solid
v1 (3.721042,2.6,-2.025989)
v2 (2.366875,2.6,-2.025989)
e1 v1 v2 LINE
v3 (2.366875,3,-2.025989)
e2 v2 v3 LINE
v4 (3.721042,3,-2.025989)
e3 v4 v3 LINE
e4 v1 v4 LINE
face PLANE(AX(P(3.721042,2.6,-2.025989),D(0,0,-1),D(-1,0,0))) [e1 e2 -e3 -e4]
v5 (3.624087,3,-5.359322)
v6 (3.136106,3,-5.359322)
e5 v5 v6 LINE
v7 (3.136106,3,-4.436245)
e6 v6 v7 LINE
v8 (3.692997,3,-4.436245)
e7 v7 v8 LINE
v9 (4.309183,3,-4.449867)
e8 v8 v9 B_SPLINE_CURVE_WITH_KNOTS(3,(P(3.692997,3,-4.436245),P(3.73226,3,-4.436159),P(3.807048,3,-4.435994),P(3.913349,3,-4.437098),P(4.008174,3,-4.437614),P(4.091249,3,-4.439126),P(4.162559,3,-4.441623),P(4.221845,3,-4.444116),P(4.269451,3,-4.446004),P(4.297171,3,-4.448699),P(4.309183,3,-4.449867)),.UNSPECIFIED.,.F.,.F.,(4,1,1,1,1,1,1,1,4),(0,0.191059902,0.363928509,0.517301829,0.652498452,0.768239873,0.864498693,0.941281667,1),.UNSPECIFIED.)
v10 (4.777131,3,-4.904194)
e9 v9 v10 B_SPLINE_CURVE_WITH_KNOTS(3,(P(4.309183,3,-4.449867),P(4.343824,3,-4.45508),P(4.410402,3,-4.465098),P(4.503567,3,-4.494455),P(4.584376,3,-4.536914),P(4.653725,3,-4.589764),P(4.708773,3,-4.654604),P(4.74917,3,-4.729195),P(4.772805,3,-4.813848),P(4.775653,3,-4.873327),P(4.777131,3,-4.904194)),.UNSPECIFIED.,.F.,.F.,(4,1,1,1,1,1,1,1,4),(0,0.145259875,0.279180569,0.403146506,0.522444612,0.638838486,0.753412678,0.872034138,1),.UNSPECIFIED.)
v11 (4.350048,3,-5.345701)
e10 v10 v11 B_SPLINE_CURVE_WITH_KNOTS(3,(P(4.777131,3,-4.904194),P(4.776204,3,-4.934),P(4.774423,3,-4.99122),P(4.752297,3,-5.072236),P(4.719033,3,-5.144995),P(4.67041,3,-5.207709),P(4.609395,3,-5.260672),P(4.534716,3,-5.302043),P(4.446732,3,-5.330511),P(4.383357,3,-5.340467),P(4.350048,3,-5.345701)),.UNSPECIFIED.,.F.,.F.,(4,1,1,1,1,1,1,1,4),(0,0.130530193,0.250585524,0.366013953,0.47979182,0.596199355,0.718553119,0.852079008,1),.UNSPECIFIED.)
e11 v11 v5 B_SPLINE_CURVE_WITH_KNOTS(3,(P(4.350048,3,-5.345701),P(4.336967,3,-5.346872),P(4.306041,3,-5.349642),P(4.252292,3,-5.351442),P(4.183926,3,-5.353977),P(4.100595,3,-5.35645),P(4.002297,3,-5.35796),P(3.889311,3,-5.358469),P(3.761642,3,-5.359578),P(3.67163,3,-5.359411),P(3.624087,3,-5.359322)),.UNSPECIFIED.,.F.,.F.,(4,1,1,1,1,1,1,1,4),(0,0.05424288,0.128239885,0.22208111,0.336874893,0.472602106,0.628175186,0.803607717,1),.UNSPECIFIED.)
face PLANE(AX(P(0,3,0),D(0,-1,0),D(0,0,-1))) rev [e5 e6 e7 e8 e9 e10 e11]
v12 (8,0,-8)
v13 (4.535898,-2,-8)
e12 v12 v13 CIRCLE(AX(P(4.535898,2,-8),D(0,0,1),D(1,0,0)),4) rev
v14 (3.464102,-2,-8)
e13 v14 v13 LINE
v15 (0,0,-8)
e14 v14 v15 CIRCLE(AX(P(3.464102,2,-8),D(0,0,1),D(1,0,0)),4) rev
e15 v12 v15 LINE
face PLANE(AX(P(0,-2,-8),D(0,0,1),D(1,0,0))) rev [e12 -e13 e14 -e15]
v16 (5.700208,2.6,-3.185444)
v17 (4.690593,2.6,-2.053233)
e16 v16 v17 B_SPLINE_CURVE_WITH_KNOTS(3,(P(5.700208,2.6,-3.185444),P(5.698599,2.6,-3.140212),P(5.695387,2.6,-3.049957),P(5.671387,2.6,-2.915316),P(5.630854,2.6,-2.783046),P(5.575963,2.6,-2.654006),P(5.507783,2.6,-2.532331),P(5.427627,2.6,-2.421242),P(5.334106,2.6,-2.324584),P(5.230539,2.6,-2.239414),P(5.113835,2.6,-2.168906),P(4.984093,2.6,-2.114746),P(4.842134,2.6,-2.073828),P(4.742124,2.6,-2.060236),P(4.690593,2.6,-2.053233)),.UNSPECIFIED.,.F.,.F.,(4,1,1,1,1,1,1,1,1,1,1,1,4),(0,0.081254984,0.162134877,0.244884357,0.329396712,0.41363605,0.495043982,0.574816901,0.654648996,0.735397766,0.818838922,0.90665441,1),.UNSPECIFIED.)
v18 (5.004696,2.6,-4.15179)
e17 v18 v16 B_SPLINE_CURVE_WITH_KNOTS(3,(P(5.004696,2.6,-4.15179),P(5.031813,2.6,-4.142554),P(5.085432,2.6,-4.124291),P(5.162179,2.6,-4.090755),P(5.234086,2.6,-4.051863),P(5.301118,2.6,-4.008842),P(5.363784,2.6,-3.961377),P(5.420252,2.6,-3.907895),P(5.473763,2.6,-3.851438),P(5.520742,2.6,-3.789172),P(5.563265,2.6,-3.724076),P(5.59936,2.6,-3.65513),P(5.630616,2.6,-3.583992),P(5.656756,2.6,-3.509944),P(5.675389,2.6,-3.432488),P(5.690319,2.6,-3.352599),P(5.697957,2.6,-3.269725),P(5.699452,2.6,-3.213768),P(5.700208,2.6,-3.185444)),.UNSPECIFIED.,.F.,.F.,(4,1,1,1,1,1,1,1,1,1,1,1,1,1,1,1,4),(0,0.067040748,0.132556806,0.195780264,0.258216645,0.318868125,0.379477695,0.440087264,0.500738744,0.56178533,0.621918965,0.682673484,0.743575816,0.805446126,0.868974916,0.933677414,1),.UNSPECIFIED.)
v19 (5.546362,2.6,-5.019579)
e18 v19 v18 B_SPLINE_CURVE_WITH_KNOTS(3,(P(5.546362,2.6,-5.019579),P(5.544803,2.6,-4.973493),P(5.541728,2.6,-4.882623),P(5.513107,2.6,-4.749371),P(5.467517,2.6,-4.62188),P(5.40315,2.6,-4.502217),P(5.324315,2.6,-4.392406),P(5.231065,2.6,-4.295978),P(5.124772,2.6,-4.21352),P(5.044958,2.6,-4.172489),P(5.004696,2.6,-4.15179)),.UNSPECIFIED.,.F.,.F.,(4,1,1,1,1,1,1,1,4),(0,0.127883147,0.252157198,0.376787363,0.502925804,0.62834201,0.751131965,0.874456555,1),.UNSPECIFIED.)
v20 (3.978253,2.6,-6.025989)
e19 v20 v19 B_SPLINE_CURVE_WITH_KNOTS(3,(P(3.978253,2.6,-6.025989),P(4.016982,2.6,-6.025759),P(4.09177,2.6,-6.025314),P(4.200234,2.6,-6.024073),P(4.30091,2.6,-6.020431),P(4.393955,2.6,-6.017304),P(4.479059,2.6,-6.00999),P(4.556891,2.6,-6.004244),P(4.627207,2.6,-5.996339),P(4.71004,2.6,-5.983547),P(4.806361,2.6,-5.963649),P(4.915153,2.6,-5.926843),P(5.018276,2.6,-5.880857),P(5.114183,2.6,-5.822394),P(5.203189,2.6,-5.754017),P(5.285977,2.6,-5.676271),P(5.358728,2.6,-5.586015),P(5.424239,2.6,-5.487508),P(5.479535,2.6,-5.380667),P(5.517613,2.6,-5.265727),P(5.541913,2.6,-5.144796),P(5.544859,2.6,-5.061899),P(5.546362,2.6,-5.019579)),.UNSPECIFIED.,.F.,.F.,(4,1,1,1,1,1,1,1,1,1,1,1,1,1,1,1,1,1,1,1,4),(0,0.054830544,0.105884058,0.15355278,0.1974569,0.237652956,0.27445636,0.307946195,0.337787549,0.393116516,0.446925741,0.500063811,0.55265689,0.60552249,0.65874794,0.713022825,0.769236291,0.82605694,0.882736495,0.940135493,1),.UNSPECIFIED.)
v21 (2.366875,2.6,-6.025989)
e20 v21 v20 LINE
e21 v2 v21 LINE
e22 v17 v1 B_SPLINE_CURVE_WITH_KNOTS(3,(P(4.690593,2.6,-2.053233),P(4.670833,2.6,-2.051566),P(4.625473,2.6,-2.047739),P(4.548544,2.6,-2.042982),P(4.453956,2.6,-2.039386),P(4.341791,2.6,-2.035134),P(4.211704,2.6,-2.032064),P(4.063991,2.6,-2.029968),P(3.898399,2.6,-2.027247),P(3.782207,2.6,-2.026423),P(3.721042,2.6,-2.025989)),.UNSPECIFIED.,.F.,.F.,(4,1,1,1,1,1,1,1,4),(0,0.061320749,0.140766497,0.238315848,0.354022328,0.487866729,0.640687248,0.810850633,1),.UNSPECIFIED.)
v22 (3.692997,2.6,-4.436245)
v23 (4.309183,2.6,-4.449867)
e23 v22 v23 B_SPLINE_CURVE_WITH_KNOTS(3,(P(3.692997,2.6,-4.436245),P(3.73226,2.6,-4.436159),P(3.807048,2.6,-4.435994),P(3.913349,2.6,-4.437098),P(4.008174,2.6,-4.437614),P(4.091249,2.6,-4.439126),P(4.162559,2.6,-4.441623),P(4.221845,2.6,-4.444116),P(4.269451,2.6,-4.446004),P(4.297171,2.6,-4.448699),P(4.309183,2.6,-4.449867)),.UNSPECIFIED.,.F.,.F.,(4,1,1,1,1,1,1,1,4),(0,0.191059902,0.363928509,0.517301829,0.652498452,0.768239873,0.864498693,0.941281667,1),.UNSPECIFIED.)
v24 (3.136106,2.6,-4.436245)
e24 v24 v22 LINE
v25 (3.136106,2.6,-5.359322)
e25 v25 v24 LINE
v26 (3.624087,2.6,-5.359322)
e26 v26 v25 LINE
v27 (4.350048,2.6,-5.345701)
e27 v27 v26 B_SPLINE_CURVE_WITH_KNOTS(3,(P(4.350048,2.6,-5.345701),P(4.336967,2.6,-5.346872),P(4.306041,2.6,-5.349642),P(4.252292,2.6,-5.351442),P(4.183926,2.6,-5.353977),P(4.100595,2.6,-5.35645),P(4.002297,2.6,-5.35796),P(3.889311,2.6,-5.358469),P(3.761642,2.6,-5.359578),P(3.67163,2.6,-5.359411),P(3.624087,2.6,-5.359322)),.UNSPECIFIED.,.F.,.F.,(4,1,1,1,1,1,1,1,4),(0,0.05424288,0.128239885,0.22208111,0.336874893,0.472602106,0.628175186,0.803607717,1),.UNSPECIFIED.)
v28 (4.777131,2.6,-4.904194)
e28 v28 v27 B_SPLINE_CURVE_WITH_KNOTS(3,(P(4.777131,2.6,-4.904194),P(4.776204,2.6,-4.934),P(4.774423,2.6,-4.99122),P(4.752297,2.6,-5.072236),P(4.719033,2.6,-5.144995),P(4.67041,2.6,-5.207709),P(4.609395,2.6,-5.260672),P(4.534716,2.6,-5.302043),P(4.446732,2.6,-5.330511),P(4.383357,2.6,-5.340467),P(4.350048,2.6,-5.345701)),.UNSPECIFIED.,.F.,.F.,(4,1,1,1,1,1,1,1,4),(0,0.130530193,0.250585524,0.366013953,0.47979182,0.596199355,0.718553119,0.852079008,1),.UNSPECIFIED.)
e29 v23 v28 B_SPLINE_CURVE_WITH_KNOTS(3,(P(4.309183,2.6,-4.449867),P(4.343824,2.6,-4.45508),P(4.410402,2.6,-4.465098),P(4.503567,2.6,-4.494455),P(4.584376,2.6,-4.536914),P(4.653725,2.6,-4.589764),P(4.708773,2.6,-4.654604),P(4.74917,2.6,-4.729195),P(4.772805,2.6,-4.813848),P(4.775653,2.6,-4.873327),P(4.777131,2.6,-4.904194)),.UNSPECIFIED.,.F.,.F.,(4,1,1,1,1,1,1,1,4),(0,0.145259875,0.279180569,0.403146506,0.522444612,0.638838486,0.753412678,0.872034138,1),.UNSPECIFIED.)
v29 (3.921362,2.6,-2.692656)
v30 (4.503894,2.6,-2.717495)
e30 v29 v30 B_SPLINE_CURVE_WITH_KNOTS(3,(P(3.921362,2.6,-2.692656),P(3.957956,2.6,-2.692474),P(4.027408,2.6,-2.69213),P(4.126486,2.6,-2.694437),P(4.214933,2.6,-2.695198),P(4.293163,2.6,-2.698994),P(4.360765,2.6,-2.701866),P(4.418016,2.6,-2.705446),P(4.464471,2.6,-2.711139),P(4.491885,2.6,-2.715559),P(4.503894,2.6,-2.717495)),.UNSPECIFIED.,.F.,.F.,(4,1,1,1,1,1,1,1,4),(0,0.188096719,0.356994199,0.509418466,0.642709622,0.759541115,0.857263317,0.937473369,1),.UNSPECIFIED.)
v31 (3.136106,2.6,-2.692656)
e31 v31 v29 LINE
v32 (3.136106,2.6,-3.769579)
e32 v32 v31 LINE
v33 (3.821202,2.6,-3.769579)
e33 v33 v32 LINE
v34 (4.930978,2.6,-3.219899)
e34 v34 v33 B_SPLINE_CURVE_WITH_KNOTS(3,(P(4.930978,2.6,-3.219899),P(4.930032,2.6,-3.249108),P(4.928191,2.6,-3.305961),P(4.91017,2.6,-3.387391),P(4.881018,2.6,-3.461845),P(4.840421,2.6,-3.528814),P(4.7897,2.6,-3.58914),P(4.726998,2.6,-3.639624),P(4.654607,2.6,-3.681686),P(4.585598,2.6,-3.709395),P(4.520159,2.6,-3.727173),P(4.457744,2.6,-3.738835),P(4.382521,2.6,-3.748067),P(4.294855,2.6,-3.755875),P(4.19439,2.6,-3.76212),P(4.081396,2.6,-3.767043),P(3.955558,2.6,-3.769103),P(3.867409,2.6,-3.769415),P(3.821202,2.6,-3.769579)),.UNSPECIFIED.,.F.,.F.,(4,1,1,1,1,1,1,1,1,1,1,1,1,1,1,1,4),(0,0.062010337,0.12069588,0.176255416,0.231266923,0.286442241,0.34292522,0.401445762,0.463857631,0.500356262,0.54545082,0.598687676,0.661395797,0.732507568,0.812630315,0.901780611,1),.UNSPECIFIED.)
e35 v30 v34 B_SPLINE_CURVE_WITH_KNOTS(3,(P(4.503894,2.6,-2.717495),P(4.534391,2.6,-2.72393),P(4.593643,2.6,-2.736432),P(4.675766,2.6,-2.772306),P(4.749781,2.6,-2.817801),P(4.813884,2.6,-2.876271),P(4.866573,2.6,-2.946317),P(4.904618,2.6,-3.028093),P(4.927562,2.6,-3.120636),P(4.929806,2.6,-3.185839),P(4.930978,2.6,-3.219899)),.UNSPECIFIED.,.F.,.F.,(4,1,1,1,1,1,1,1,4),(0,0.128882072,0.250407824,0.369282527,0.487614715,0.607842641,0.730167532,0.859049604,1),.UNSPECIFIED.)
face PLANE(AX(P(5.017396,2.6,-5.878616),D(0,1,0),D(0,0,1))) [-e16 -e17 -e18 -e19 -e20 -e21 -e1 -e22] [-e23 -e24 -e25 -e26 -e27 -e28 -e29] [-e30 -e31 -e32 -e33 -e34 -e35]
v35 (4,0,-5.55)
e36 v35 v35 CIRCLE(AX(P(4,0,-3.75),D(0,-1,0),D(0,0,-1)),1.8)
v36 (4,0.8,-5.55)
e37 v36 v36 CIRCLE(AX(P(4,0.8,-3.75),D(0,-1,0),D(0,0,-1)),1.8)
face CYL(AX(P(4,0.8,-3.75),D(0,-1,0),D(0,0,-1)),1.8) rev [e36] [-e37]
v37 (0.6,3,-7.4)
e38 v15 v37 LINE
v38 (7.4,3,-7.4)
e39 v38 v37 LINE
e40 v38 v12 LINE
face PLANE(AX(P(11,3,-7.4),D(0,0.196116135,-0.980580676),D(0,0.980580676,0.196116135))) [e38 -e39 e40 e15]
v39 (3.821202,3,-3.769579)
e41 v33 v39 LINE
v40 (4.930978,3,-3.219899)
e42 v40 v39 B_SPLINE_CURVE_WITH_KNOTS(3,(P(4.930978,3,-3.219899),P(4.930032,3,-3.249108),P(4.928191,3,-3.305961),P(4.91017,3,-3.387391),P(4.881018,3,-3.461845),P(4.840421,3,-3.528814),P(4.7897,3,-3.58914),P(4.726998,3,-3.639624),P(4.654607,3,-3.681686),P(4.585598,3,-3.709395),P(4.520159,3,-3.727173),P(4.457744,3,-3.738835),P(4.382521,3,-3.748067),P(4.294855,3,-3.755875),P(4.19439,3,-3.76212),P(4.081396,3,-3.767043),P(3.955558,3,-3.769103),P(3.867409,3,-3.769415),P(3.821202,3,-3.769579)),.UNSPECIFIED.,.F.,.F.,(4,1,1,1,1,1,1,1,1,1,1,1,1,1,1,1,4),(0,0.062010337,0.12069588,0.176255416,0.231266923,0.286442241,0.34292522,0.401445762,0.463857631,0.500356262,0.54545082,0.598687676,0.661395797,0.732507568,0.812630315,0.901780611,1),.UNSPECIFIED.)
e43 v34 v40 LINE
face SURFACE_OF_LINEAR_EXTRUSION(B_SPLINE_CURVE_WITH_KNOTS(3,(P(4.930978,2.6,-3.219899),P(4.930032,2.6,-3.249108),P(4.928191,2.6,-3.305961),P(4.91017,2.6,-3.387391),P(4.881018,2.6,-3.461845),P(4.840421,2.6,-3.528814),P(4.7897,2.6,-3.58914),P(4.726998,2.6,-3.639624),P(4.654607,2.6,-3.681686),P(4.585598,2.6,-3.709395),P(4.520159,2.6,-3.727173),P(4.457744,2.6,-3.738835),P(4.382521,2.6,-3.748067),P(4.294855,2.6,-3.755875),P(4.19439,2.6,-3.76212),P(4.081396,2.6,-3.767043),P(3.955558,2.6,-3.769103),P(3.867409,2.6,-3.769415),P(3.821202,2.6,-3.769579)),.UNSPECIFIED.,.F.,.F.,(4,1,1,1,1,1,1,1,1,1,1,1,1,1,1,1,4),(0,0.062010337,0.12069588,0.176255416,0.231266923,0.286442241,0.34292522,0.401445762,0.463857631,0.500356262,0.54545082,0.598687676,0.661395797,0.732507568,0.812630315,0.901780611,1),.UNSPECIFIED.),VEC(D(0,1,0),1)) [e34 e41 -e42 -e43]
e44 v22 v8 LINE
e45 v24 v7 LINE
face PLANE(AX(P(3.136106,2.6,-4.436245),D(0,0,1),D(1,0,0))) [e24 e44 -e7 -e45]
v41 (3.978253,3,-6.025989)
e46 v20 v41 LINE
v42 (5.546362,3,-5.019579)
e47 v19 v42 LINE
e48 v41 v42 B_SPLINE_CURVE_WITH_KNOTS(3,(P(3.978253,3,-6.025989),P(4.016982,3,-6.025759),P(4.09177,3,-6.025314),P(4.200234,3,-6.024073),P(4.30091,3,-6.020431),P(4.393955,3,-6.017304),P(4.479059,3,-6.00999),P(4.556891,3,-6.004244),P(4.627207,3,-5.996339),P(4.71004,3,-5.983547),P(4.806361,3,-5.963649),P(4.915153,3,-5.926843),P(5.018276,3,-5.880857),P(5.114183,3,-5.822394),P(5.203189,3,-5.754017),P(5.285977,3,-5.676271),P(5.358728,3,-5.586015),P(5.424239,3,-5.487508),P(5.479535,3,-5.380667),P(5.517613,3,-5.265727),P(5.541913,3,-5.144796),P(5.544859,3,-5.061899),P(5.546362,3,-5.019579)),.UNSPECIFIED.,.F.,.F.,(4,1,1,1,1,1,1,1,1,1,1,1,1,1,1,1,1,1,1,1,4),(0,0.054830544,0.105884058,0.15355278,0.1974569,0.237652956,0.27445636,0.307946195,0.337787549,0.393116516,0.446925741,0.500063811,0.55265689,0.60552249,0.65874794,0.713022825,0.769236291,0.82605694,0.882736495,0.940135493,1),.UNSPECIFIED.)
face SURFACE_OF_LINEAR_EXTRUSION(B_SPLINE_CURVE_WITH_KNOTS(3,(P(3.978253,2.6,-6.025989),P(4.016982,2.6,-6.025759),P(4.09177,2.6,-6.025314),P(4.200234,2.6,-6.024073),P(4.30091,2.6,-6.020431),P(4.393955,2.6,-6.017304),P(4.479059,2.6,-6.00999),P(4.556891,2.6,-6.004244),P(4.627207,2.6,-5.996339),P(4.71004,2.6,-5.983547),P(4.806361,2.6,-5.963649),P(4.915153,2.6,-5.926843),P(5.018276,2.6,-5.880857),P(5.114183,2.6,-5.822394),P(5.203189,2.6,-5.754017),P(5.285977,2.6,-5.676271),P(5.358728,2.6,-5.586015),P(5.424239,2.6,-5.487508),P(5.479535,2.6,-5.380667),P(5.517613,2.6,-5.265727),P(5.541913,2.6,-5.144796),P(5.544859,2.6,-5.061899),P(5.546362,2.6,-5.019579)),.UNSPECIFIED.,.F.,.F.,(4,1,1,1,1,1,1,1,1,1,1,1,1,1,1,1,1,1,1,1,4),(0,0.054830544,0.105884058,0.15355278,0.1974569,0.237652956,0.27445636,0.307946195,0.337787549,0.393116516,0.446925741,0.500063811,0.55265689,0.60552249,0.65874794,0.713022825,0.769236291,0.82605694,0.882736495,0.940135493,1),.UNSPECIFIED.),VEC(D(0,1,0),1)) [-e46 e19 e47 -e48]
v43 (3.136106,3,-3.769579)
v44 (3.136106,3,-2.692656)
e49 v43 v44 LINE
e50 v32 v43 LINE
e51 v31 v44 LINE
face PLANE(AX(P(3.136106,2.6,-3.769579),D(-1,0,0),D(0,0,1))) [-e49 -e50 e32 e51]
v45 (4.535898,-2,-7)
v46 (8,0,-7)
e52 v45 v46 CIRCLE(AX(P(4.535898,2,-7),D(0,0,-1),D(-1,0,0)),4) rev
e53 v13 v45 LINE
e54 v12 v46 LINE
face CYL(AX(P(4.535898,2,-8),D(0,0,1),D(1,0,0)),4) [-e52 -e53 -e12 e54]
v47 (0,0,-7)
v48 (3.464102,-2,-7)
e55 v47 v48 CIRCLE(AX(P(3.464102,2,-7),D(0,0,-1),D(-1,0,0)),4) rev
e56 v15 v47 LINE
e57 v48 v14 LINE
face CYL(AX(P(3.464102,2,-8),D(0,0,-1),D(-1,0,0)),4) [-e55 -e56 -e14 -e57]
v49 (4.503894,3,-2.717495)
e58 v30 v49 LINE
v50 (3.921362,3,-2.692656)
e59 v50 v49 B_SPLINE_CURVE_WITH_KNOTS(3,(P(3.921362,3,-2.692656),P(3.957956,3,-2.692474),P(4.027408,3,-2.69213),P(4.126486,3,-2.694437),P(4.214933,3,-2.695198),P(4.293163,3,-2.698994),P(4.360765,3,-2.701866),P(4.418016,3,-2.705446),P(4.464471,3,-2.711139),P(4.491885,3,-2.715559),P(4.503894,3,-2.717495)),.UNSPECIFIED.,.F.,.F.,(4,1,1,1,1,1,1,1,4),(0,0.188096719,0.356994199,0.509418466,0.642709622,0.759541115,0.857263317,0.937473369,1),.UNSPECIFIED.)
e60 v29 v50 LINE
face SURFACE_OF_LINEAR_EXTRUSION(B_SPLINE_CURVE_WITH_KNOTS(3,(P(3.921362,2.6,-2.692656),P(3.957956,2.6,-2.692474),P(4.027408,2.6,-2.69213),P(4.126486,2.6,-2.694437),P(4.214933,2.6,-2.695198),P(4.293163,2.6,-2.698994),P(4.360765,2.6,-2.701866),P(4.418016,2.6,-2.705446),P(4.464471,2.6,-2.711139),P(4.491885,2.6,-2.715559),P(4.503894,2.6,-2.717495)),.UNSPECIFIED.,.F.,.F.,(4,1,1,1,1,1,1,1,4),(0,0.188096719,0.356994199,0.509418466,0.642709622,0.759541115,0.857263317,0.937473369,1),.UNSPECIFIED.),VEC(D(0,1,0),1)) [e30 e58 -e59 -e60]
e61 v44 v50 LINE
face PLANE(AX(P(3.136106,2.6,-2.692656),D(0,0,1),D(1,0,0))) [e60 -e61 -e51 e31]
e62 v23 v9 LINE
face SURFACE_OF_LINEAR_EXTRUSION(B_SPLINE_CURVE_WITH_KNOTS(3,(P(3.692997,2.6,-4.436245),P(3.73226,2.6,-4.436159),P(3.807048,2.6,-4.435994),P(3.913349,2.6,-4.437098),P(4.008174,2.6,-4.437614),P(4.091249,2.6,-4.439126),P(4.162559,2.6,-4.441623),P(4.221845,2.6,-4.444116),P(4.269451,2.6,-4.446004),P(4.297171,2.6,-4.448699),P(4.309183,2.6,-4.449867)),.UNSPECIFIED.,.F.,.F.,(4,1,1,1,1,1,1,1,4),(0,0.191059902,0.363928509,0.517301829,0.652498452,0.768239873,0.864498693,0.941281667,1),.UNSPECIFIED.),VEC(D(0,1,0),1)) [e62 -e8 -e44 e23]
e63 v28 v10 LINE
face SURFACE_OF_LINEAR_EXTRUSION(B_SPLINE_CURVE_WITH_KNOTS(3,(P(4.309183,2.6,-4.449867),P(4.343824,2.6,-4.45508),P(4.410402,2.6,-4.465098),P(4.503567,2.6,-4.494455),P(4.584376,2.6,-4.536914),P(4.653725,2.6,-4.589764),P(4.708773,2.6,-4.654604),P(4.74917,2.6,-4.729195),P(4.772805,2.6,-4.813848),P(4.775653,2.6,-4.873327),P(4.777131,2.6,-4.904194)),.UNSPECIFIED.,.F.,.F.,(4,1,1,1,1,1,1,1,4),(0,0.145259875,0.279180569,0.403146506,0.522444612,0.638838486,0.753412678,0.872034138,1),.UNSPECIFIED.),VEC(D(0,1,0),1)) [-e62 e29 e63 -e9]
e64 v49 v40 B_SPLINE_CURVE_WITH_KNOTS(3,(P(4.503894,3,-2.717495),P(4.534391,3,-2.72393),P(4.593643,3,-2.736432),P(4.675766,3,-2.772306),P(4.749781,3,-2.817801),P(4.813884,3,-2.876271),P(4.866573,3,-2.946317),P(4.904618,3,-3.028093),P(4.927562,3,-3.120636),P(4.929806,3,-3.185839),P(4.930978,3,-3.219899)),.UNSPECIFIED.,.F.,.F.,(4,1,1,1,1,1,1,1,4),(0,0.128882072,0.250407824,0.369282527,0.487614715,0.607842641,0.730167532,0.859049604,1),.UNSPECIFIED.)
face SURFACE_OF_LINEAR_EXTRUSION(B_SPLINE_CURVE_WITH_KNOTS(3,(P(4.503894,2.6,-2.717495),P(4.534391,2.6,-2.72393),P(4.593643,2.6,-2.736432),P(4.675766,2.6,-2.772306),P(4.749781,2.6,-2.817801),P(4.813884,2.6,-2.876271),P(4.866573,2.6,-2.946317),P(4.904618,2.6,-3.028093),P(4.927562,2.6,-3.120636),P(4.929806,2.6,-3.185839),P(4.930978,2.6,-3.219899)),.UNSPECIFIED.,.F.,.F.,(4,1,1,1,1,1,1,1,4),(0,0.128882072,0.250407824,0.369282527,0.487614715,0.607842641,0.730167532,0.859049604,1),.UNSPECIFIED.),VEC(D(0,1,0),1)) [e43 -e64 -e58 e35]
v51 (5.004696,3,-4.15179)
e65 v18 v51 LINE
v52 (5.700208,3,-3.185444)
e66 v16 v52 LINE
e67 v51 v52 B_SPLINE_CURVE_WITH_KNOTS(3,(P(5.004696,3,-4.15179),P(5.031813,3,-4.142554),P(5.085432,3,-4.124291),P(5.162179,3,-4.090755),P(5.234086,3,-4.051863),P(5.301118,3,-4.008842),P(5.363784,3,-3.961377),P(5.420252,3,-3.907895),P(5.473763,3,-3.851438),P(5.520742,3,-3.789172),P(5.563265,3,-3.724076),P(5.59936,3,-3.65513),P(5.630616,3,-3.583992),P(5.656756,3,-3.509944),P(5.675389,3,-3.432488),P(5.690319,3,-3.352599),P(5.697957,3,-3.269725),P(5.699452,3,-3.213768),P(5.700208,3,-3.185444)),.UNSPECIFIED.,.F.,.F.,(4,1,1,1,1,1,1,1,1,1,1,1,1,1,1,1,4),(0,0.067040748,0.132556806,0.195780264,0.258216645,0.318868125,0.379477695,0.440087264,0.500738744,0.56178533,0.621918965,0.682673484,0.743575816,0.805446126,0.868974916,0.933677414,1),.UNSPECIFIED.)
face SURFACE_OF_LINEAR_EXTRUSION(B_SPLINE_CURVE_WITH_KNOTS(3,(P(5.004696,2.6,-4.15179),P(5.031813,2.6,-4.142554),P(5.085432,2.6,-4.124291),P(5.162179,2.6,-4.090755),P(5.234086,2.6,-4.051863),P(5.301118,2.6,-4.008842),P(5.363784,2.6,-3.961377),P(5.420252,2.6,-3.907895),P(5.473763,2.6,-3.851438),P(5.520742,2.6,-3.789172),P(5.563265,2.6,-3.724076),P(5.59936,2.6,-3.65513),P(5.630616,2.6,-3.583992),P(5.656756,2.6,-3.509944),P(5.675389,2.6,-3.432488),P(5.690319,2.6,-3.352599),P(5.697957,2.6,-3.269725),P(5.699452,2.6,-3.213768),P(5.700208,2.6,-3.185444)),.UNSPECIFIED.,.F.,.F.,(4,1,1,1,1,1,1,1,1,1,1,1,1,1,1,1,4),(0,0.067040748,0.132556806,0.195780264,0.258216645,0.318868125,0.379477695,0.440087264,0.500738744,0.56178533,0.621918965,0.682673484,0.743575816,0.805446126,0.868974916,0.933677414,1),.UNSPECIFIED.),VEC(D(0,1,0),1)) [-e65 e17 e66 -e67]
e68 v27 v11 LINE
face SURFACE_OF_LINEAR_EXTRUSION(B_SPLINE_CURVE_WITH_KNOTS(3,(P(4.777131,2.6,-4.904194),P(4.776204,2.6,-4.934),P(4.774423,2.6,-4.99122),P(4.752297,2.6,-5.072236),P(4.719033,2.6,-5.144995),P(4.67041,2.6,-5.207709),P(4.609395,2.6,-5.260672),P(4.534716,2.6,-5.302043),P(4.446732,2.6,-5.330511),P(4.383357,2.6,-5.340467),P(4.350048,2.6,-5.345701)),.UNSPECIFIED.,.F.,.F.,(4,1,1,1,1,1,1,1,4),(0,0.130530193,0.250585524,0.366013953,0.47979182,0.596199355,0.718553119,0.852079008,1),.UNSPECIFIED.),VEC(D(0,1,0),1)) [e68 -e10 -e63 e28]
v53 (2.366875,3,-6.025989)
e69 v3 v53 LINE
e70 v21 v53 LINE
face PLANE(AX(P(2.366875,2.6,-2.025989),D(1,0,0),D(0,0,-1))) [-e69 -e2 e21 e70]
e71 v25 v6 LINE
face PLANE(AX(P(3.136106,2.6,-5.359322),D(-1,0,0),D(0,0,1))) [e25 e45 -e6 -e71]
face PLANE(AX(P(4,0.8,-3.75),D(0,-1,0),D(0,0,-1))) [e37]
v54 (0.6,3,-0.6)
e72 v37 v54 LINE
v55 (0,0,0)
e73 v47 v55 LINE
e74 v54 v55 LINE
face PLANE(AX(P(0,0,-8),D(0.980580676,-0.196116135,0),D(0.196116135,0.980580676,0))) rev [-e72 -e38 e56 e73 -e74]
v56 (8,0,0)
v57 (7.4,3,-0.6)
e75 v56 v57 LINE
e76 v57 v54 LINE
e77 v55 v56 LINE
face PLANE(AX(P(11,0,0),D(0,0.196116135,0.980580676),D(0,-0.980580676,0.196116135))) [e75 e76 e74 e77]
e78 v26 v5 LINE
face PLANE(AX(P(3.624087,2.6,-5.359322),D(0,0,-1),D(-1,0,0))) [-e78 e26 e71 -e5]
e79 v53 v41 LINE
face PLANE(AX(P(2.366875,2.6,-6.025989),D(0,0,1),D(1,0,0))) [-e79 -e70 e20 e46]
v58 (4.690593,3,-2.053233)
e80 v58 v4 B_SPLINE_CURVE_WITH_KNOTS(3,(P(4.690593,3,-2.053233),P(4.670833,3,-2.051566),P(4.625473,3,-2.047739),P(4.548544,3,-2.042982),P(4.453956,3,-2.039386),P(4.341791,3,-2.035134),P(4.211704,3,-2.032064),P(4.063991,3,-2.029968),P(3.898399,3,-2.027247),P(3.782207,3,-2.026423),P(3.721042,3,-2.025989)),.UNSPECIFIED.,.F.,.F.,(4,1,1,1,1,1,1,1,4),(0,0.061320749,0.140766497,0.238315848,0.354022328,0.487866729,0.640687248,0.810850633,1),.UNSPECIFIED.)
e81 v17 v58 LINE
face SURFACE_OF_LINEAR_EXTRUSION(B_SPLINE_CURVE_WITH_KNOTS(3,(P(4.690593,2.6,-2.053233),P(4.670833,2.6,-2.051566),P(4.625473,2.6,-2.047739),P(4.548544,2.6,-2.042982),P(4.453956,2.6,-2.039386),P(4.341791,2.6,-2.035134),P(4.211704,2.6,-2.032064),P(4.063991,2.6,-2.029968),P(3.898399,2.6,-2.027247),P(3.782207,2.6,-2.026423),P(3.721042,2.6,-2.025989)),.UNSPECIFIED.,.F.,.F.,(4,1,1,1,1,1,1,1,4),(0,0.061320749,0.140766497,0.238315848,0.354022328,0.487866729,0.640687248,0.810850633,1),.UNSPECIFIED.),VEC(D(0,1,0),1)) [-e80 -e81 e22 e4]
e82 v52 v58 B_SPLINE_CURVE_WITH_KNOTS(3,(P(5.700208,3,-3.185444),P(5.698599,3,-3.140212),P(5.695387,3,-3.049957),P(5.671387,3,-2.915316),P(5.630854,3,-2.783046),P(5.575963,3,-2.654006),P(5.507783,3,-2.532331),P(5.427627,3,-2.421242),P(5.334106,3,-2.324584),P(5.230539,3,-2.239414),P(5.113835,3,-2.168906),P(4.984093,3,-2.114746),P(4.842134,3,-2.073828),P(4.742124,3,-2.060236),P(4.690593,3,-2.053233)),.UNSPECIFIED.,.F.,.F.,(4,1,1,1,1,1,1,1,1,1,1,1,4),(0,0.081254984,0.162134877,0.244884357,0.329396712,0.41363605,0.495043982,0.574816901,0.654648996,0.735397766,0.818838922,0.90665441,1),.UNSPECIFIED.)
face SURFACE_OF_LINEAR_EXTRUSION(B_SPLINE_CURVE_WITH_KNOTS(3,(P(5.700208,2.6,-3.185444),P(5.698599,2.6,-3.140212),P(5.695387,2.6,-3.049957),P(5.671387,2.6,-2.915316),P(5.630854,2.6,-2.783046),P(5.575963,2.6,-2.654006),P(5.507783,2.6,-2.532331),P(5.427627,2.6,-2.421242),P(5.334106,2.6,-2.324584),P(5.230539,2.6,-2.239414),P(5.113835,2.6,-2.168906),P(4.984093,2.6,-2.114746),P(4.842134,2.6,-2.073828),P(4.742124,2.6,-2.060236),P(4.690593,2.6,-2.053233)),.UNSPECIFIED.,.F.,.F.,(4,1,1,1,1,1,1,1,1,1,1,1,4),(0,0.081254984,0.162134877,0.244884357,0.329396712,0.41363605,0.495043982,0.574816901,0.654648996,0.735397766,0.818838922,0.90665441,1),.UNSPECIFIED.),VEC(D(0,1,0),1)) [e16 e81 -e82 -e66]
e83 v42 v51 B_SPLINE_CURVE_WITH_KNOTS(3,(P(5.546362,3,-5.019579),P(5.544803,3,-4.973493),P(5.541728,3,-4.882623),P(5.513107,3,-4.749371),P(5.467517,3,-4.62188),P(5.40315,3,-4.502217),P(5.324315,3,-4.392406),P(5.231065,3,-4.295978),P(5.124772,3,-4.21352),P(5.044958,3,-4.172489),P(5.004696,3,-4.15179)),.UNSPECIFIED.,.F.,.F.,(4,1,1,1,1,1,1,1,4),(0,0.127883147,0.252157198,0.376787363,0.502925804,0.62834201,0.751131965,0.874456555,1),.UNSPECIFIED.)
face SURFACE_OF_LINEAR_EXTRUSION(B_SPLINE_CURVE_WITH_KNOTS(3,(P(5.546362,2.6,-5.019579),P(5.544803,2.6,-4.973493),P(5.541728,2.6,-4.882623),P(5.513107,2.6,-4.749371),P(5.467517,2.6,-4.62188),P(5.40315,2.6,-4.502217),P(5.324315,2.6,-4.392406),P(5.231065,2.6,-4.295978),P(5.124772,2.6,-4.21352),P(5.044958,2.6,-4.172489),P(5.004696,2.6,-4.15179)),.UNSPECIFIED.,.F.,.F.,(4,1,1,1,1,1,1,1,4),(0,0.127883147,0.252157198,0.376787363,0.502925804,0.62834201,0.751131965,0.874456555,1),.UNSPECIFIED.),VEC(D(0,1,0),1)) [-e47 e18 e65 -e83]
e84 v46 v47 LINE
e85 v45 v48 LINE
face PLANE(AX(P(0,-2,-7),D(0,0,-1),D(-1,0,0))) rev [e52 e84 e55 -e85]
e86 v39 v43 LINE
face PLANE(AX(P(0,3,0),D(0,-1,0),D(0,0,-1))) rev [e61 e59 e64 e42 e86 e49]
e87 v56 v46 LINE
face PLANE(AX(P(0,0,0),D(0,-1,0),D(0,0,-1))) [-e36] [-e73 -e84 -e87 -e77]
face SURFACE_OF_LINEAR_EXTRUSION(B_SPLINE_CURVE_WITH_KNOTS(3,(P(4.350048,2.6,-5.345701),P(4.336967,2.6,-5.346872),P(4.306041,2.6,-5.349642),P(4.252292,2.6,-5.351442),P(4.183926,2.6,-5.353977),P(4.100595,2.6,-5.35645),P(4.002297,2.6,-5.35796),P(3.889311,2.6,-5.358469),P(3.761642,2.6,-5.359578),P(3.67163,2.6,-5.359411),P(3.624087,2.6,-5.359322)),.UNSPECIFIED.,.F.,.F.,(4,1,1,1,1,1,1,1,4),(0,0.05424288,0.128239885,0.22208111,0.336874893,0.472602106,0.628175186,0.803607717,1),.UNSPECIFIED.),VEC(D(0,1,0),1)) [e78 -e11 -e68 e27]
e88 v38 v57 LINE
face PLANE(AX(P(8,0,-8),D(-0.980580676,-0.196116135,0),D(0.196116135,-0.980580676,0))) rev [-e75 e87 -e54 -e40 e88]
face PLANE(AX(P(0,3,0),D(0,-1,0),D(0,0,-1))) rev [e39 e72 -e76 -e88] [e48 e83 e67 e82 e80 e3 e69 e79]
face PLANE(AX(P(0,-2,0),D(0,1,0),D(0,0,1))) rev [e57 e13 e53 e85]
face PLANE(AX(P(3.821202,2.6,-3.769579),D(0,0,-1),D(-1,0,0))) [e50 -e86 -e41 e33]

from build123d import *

# Parameters (mm, degrees)
SKETCH1_W               = 8
SKETCH1_H               = 8
BOSS_EXTRUDE1_DEPTH     = 3
CUT_EXTRUDE1_DEPTH      = 12.704699911
CUT_EXTRUDE1_DEPTH_BACK = 12.704699911
CUT_EXTRUDE2_DEPTH      = 11
SKETCH4_R               = 1.8
CUT_EXTRUDE3_DEPTH      = 0.8
SKETCH5_W               = 8
SKETCH5_H               = 1
BOSS_EXTRUDE2_DEPTH     = 2
FILLET1_R               = 4
CUT_EXTRUDE4_DEPTH      = 0.4


with BuildPart() as part:
    # Sketch1 → Boss-Extrude1 (new body)
    with BuildSketch(Plane(origin=(0, 0, 0), x_dir=(1, 0, 0), z_dir=(0, 1, 0))):
        with Locations((4, 4)):
            Rectangle(SKETCH1_W, SKETCH1_H)
    extrude(amount=BOSS_EXTRUDE1_DEPTH)

    # Sketch2 → Cut-Extrude1 (cut, two sides: drawn at the far end of the back side and taken through both)
    with BuildSketch(Plane.XY.offset(-CUT_EXTRUDE1_DEPTH_BACK)):
        Polygon((0, 0), (0.6, 3), (0, 3), align=None)
        Polygon((8, 0), (7.4, 3), (8, 3), align=None)
    extrude(amount=CUT_EXTRUDE1_DEPTH + CUT_EXTRUDE1_DEPTH_BACK, mode=Mode.SUBTRACT)

    # Sketch3 → Cut-Extrude2 (cut)
    with BuildSketch(Plane(origin=(0, 0, 0), x_dir=(0, 0, -1), z_dir=(1, 0, 0))):
        Polygon((0, 0), (0.6, 3), (0, 3), align=None)
        Polygon((8, 3), (7.4, 3), (8, 0), align=None)
    extrude(amount=CUT_EXTRUDE2_DEPTH, mode=Mode.SUBTRACT)

    # Sketch4 → Cut-Extrude3 (cut)
    with BuildSketch(Plane.XZ):
        with Locations(Location((4, -3.75, 0), (0, 0, 270))):
            Circle(SKETCH4_R)
    extrude(amount=-CUT_EXTRUDE3_DEPTH, mode=Mode.SUBTRACT)

    # Sketch5 → Boss-Extrude2 (add)
    with BuildSketch(Plane.XZ):
        with Locations((4, -7.5)):
            Rectangle(SKETCH5_W, SKETCH5_H)
    extrude(amount=BOSS_EXTRUDE2_DEPTH)

    # Fillet1
    # the kernel refuses this fillet: 4 mm, written as the material it takes off along each edge
    with BuildSketch(Plane(origin=(8, -2, -16.660254038), x_dir=(0, 1, 0), z_dir=(0, 0, 1)), Plane(origin=(0, -2, 1.660254038), x_dir=(0, 1, 0), z_dir=(0, 0, -1))) as fillet1_piece_1:
        with BuildLine():
            CenterArc((4, 3.464101615), FILLET1_R, 180, 60)
            Line((0, 3.464101615), (-0.08, 3.464101615))
            Line((-0.08, 3.464101615), (-0.08, 0))
            Line((-0.08, 0), (0, -0.08))
            ThreePointArc((0, -0.08), (1, -0.08), (1.96, -0.069282032))
            Line((1.96, -0.069282032), (2, 0))
        make_face()
    extrude(amount=18.320508076, mode=Mode.SUBTRACT)

    # Sketch6 → Cut-Extrude4 (cut)
    with BuildSketch(Plane(origin=(0, 3, 0), x_dir=(1, 0, 0), z_dir=(0, 1, 0))):
        with BuildLine():
            Line((2.366875023, 6.025988971), (3.978253228, 6.025988971))
            add(Edge.make_bspline(
                [(3.978253228, 6.025988971), (4.016981522, 6.025758539), (4.091770291, 6.025313549), (4.200234262, 6.02407341), (4.300910244, 6.020431423), (4.393955008, 6.01730407), (4.479059098, 6.009990491), (4.556891378, 6.004244483), (4.627206795, 5.996339471), (4.710040188, 5.983546816), (4.806360793, 5.963648743), (4.915152558, 5.926842691), (5.018276483, 5.880857129), (5.114182519, 5.822393524), (5.203189243, 5.754016663), (5.28597738, 5.676271174), (5.358728101, 5.58601543), (5.424238976, 5.487508268), (5.479534837, 5.380666952), (5.517612886, 5.26572697), (5.541913225, 5.144795761), (5.544858568, 5.061898711), (5.546362202, 5.019578715)],
                knots=[0, 0, 0, 0, 1.096610875, 2.117681168, 3.071055591, 3.949137991, 4.753059115, 5.489127199, 6.15892391, 6.75575099, 7.862330316, 8.938514814, 10.001276227, 11.05313779, 12.110449801, 13.174958802, 14.260456508, 15.384725817, 16.521138801, 17.654729897, 18.802709851, 20, 20, 20, 20], degree=3))
            add(Edge.make_bspline(
                [(5.546362202, 5.019578715), (5.544802721, 4.973493311), (5.541727769, 4.882623117), (5.513106772, 4.749371009), (5.467516851, 4.621879661), (5.40315043, 4.502217288), (5.324314646, 4.392405777), (5.231065087, 4.295977947), (5.12477188, 4.213520097), (5.044958184, 4.17248881), (5.004695536, 4.151790253)],
                knots=[0, 0, 0, 0, 1.023065178, 2.01725758, 3.014298905, 4.023406433, 5.026736079, 6.009055718, 6.99565244, 8, 8, 8, 8], degree=3))
            add(Edge.make_bspline(
                [(5.004695536, 4.151790253), (5.0318132, 4.142553707), (5.085431798, 4.12429068), (5.162178571, 4.090754541), (5.234086142, 4.051862796), (5.301118401, 4.008841827), (5.363784101, 3.961377137), (5.420252395, 3.907894911), (5.473763466, 3.851437899), (5.520742036, 3.789172127), (5.563264851, 3.724075672), (5.599360366, 3.65512964), (5.630616076, 3.583992364), (5.656755805, 3.509943884), (5.675388869, 3.432487562), (5.69031884, 3.352599145), (5.697956597, 3.269724954), (5.699451608, 3.213768347), (5.700208356, 3.185444099)],
                knots=[0, 0, 0, 0, 1.072651974, 2.1209089, 3.132484228, 4.131466326, 5.101889999, 6.071643115, 7.041396231, 8.011819904, 8.988565287, 9.95070344, 10.922775742, 11.897213062, 12.887138018, 13.903598663, 14.938838629, 16, 16, 16, 16], degree=3))
            add(Edge.make_bspline(
                [(5.700208356, 3.185444099), (5.698598844, 3.140212221), (5.695387249, 3.049957264), (5.671387404, 2.915316113), (5.630853991, 2.783046233), (5.575963383, 2.654005704), (5.507783193, 2.532330941), (5.427626978, 2.4212421), (5.334105775, 2.324584109), (5.230539132, 2.239414342), (5.113835126, 2.16890592), (4.984093466, 2.114745557), (4.842134035, 2.073828468), (4.742124288, 2.060236169), (4.690592972, 2.053232561)],
                knots=[0, 0, 0, 0, 0.975059807, 1.945618526, 2.93861228, 3.952760547, 4.963632603, 5.940527786, 6.897802811, 7.855787948, 8.824773195, 9.82606706, 10.879852914, 12, 12, 12, 12], degree=3))
            add(Edge.make_bspline(
                [(4.690592972, 2.053232561), (4.670833027, 2.051565703), (4.625472552, 2.047739302), (4.548543711, 2.042982046), (4.453955886, 2.039386091), (4.341791209, 2.035134329), (4.211704387, 2.032064432), (4.063991072, 2.029968108), (3.898399223, 2.027247493), (3.782207382, 2.026423), (3.72104169, 2.025988971)],
                knots=[0, 0, 0, 0, 0.490565993, 1.126131979, 1.906526787, 2.832178623, 3.902933831, 5.125497984, 6.486805064, 8, 8, 8, 8], degree=3))
            Line((3.72104169, 2.025988971), (2.366875023, 2.025988971))
            Line((2.366875023, 2.025988971), (2.366875023, 6.025988971))
        make_face()
        with BuildLine():
            Line((3.136105792, 5.359322304), (3.136105792, 4.436245381))
            Line((3.136105792, 4.436245381), (3.692996818, 4.436245381))
            add(Edge.make_bspline(
                [(3.692996818, 4.436245381), (3.732259986, 4.43615888), (3.807047978, 4.435994114), (3.91334909, 4.43709824), (4.008173732, 4.437613694), (4.091249283, 4.439126475), (4.162558686, 4.441623123), (4.221845003, 4.444116229), (4.269450826, 4.446003799), (4.297170592, 4.448699163), (4.309182715, 4.449867176)],
                knots=[0, 0, 0, 0, 1.528479216, 2.911428072, 4.138414629, 5.21998762, 6.145918986, 6.915989543, 7.530253335, 8, 8, 8, 8], degree=3))
            add(Edge.make_bspline(
                [(4.309182715, 4.449867176), (4.3438238, 4.455079871), (4.41040184, 4.465098351), (4.503567155, 4.494454854), (4.584375726, 4.536913614), (4.653724553, 4.58976356), (4.708773054, 4.654604252), (4.749170144, 4.72919452), (4.772805412, 4.813847791), (4.775653451, 4.873327339), (4.777131433, 4.904194099)],
                knots=[0, 0, 0, 0, 1.162079002, 2.233444551, 3.225172046, 4.179556897, 5.110707885, 6.027301426, 6.976273101, 8, 8, 8, 8], degree=3))
            add(Edge.make_bspline(
                [(4.777131433, 4.904194099), (4.776203651, 4.934000177), (4.774422539, 4.991220438), (4.752297006, 5.072236392), (4.719032932, 5.144995211), (4.670409719, 5.207709385), (4.609395094, 5.260672186), (4.534716376, 5.302043411), (4.446732173, 5.330510733), (4.38335661, 5.340467498), (4.3500481, 5.345700509)],
                knots=[0, 0, 0, 0, 1.044241546, 2.004684189, 2.928111627, 3.838334562, 4.769594837, 5.748424953, 6.81663206, 8, 8, 8, 8], degree=3))
            add(Edge.make_bspline(
                [(4.3500481, 5.345700509), (4.336967148, 5.34687206), (4.306041436, 5.349641817), (4.252292165, 5.35144236), (4.183926257, 5.353976507), (4.100595234, 5.356449705), (4.002296842, 5.357959731), (3.889310645, 5.358468661), (3.761641688, 5.359577608), (3.671629596, 5.359410545), (3.624086561, 5.359322304)],
                knots=[0, 0, 0, 0, 0.433943041, 1.02591908, 1.776648879, 2.694999143, 3.780816848, 5.02540149, 6.428861738, 8, 8, 8, 8], degree=3))
            Line((3.624086561, 5.359322304), (3.136105792, 5.359322304))
        make_face(mode=Mode.SUBTRACT)
        with BuildLine():
            Line((3.136105792, 3.769578715), (3.136105792, 2.692655638))
            Line((3.136105792, 2.692655638), (3.921362202, 2.692655638))
            add(Edge.make_bspline(
                [(3.921362202, 2.692655638), (3.957955896, 2.692474114), (4.027408125, 2.692129595), (4.126486109, 2.694437139), (4.214933064, 2.69519802), (4.293162962, 2.698994102), (4.360764719, 2.701865798), (4.418016495, 2.705445849), (4.464471269, 2.711139165), (4.491885355, 2.715559172), (4.503894254, 2.717495381)],
                knots=[0, 0, 0, 0, 1.504773752, 2.85595359, 4.075347731, 5.141676974, 6.076328919, 6.858106537, 7.499786952, 8, 8, 8, 8], degree=3))
            add(Edge.make_bspline(
                [(4.503894254, 2.717495381), (4.534390702, 2.723929926), (4.593642924, 2.736431746), (4.675765739, 2.772305806), (4.749780788, 2.817800627), (4.813883543, 2.876271003), (4.866572685, 2.946316906), (4.904617992, 3.02809262), (4.927561873, 3.120636015), (4.929805566, 3.185839411), (4.930977587, 3.219899227)],
                knots=[0, 0, 0, 0, 1.031056579, 2.003262591, 2.954260215, 3.900917722, 4.862741126, 5.841340256, 6.872396835, 8, 8, 8, 8], degree=3))
            add(Edge.make_bspline(
                [(4.930977587, 3.219899227), (4.930031736, 3.249108452), (4.928190747, 3.305960799), (4.910169932, 3.38739087), (4.88101832, 3.461844609), (4.840421058, 3.528813936), (4.789699747, 3.589139928), (4.726998003, 3.639624345), (4.654607383, 3.681685756), (4.585597801, 3.709395341), (4.520158829, 3.72717269), (4.457743787, 3.73883498), (4.382520906, 3.748066566), (4.294854864, 3.755875466), (4.194389919, 3.762120128), (4.081396073, 3.767043008), (3.95555801, 3.769103428), (3.867409493, 3.769415255), (3.821201946, 3.769578715)],
                knots=[0, 0, 0, 0, 0.992165387, 1.931134082, 2.820086661, 3.700270762, 4.583075858, 5.486803518, 6.423132184, 7.421722103, 8.005700193, 8.727213115, 9.57900282, 10.582332745, 11.720121093, 13.002085041, 14.428489784, 16, 16, 16, 16], degree=3))
            Line((3.821201946, 3.769578715), (3.136105792, 3.769578715))
        make_face(mode=Mode.SUBTRACT)
    extrude(amount=-CUT_EXTRUDE4_DEPTH, mode=Mode.SUBTRACT)


solid = part.part
